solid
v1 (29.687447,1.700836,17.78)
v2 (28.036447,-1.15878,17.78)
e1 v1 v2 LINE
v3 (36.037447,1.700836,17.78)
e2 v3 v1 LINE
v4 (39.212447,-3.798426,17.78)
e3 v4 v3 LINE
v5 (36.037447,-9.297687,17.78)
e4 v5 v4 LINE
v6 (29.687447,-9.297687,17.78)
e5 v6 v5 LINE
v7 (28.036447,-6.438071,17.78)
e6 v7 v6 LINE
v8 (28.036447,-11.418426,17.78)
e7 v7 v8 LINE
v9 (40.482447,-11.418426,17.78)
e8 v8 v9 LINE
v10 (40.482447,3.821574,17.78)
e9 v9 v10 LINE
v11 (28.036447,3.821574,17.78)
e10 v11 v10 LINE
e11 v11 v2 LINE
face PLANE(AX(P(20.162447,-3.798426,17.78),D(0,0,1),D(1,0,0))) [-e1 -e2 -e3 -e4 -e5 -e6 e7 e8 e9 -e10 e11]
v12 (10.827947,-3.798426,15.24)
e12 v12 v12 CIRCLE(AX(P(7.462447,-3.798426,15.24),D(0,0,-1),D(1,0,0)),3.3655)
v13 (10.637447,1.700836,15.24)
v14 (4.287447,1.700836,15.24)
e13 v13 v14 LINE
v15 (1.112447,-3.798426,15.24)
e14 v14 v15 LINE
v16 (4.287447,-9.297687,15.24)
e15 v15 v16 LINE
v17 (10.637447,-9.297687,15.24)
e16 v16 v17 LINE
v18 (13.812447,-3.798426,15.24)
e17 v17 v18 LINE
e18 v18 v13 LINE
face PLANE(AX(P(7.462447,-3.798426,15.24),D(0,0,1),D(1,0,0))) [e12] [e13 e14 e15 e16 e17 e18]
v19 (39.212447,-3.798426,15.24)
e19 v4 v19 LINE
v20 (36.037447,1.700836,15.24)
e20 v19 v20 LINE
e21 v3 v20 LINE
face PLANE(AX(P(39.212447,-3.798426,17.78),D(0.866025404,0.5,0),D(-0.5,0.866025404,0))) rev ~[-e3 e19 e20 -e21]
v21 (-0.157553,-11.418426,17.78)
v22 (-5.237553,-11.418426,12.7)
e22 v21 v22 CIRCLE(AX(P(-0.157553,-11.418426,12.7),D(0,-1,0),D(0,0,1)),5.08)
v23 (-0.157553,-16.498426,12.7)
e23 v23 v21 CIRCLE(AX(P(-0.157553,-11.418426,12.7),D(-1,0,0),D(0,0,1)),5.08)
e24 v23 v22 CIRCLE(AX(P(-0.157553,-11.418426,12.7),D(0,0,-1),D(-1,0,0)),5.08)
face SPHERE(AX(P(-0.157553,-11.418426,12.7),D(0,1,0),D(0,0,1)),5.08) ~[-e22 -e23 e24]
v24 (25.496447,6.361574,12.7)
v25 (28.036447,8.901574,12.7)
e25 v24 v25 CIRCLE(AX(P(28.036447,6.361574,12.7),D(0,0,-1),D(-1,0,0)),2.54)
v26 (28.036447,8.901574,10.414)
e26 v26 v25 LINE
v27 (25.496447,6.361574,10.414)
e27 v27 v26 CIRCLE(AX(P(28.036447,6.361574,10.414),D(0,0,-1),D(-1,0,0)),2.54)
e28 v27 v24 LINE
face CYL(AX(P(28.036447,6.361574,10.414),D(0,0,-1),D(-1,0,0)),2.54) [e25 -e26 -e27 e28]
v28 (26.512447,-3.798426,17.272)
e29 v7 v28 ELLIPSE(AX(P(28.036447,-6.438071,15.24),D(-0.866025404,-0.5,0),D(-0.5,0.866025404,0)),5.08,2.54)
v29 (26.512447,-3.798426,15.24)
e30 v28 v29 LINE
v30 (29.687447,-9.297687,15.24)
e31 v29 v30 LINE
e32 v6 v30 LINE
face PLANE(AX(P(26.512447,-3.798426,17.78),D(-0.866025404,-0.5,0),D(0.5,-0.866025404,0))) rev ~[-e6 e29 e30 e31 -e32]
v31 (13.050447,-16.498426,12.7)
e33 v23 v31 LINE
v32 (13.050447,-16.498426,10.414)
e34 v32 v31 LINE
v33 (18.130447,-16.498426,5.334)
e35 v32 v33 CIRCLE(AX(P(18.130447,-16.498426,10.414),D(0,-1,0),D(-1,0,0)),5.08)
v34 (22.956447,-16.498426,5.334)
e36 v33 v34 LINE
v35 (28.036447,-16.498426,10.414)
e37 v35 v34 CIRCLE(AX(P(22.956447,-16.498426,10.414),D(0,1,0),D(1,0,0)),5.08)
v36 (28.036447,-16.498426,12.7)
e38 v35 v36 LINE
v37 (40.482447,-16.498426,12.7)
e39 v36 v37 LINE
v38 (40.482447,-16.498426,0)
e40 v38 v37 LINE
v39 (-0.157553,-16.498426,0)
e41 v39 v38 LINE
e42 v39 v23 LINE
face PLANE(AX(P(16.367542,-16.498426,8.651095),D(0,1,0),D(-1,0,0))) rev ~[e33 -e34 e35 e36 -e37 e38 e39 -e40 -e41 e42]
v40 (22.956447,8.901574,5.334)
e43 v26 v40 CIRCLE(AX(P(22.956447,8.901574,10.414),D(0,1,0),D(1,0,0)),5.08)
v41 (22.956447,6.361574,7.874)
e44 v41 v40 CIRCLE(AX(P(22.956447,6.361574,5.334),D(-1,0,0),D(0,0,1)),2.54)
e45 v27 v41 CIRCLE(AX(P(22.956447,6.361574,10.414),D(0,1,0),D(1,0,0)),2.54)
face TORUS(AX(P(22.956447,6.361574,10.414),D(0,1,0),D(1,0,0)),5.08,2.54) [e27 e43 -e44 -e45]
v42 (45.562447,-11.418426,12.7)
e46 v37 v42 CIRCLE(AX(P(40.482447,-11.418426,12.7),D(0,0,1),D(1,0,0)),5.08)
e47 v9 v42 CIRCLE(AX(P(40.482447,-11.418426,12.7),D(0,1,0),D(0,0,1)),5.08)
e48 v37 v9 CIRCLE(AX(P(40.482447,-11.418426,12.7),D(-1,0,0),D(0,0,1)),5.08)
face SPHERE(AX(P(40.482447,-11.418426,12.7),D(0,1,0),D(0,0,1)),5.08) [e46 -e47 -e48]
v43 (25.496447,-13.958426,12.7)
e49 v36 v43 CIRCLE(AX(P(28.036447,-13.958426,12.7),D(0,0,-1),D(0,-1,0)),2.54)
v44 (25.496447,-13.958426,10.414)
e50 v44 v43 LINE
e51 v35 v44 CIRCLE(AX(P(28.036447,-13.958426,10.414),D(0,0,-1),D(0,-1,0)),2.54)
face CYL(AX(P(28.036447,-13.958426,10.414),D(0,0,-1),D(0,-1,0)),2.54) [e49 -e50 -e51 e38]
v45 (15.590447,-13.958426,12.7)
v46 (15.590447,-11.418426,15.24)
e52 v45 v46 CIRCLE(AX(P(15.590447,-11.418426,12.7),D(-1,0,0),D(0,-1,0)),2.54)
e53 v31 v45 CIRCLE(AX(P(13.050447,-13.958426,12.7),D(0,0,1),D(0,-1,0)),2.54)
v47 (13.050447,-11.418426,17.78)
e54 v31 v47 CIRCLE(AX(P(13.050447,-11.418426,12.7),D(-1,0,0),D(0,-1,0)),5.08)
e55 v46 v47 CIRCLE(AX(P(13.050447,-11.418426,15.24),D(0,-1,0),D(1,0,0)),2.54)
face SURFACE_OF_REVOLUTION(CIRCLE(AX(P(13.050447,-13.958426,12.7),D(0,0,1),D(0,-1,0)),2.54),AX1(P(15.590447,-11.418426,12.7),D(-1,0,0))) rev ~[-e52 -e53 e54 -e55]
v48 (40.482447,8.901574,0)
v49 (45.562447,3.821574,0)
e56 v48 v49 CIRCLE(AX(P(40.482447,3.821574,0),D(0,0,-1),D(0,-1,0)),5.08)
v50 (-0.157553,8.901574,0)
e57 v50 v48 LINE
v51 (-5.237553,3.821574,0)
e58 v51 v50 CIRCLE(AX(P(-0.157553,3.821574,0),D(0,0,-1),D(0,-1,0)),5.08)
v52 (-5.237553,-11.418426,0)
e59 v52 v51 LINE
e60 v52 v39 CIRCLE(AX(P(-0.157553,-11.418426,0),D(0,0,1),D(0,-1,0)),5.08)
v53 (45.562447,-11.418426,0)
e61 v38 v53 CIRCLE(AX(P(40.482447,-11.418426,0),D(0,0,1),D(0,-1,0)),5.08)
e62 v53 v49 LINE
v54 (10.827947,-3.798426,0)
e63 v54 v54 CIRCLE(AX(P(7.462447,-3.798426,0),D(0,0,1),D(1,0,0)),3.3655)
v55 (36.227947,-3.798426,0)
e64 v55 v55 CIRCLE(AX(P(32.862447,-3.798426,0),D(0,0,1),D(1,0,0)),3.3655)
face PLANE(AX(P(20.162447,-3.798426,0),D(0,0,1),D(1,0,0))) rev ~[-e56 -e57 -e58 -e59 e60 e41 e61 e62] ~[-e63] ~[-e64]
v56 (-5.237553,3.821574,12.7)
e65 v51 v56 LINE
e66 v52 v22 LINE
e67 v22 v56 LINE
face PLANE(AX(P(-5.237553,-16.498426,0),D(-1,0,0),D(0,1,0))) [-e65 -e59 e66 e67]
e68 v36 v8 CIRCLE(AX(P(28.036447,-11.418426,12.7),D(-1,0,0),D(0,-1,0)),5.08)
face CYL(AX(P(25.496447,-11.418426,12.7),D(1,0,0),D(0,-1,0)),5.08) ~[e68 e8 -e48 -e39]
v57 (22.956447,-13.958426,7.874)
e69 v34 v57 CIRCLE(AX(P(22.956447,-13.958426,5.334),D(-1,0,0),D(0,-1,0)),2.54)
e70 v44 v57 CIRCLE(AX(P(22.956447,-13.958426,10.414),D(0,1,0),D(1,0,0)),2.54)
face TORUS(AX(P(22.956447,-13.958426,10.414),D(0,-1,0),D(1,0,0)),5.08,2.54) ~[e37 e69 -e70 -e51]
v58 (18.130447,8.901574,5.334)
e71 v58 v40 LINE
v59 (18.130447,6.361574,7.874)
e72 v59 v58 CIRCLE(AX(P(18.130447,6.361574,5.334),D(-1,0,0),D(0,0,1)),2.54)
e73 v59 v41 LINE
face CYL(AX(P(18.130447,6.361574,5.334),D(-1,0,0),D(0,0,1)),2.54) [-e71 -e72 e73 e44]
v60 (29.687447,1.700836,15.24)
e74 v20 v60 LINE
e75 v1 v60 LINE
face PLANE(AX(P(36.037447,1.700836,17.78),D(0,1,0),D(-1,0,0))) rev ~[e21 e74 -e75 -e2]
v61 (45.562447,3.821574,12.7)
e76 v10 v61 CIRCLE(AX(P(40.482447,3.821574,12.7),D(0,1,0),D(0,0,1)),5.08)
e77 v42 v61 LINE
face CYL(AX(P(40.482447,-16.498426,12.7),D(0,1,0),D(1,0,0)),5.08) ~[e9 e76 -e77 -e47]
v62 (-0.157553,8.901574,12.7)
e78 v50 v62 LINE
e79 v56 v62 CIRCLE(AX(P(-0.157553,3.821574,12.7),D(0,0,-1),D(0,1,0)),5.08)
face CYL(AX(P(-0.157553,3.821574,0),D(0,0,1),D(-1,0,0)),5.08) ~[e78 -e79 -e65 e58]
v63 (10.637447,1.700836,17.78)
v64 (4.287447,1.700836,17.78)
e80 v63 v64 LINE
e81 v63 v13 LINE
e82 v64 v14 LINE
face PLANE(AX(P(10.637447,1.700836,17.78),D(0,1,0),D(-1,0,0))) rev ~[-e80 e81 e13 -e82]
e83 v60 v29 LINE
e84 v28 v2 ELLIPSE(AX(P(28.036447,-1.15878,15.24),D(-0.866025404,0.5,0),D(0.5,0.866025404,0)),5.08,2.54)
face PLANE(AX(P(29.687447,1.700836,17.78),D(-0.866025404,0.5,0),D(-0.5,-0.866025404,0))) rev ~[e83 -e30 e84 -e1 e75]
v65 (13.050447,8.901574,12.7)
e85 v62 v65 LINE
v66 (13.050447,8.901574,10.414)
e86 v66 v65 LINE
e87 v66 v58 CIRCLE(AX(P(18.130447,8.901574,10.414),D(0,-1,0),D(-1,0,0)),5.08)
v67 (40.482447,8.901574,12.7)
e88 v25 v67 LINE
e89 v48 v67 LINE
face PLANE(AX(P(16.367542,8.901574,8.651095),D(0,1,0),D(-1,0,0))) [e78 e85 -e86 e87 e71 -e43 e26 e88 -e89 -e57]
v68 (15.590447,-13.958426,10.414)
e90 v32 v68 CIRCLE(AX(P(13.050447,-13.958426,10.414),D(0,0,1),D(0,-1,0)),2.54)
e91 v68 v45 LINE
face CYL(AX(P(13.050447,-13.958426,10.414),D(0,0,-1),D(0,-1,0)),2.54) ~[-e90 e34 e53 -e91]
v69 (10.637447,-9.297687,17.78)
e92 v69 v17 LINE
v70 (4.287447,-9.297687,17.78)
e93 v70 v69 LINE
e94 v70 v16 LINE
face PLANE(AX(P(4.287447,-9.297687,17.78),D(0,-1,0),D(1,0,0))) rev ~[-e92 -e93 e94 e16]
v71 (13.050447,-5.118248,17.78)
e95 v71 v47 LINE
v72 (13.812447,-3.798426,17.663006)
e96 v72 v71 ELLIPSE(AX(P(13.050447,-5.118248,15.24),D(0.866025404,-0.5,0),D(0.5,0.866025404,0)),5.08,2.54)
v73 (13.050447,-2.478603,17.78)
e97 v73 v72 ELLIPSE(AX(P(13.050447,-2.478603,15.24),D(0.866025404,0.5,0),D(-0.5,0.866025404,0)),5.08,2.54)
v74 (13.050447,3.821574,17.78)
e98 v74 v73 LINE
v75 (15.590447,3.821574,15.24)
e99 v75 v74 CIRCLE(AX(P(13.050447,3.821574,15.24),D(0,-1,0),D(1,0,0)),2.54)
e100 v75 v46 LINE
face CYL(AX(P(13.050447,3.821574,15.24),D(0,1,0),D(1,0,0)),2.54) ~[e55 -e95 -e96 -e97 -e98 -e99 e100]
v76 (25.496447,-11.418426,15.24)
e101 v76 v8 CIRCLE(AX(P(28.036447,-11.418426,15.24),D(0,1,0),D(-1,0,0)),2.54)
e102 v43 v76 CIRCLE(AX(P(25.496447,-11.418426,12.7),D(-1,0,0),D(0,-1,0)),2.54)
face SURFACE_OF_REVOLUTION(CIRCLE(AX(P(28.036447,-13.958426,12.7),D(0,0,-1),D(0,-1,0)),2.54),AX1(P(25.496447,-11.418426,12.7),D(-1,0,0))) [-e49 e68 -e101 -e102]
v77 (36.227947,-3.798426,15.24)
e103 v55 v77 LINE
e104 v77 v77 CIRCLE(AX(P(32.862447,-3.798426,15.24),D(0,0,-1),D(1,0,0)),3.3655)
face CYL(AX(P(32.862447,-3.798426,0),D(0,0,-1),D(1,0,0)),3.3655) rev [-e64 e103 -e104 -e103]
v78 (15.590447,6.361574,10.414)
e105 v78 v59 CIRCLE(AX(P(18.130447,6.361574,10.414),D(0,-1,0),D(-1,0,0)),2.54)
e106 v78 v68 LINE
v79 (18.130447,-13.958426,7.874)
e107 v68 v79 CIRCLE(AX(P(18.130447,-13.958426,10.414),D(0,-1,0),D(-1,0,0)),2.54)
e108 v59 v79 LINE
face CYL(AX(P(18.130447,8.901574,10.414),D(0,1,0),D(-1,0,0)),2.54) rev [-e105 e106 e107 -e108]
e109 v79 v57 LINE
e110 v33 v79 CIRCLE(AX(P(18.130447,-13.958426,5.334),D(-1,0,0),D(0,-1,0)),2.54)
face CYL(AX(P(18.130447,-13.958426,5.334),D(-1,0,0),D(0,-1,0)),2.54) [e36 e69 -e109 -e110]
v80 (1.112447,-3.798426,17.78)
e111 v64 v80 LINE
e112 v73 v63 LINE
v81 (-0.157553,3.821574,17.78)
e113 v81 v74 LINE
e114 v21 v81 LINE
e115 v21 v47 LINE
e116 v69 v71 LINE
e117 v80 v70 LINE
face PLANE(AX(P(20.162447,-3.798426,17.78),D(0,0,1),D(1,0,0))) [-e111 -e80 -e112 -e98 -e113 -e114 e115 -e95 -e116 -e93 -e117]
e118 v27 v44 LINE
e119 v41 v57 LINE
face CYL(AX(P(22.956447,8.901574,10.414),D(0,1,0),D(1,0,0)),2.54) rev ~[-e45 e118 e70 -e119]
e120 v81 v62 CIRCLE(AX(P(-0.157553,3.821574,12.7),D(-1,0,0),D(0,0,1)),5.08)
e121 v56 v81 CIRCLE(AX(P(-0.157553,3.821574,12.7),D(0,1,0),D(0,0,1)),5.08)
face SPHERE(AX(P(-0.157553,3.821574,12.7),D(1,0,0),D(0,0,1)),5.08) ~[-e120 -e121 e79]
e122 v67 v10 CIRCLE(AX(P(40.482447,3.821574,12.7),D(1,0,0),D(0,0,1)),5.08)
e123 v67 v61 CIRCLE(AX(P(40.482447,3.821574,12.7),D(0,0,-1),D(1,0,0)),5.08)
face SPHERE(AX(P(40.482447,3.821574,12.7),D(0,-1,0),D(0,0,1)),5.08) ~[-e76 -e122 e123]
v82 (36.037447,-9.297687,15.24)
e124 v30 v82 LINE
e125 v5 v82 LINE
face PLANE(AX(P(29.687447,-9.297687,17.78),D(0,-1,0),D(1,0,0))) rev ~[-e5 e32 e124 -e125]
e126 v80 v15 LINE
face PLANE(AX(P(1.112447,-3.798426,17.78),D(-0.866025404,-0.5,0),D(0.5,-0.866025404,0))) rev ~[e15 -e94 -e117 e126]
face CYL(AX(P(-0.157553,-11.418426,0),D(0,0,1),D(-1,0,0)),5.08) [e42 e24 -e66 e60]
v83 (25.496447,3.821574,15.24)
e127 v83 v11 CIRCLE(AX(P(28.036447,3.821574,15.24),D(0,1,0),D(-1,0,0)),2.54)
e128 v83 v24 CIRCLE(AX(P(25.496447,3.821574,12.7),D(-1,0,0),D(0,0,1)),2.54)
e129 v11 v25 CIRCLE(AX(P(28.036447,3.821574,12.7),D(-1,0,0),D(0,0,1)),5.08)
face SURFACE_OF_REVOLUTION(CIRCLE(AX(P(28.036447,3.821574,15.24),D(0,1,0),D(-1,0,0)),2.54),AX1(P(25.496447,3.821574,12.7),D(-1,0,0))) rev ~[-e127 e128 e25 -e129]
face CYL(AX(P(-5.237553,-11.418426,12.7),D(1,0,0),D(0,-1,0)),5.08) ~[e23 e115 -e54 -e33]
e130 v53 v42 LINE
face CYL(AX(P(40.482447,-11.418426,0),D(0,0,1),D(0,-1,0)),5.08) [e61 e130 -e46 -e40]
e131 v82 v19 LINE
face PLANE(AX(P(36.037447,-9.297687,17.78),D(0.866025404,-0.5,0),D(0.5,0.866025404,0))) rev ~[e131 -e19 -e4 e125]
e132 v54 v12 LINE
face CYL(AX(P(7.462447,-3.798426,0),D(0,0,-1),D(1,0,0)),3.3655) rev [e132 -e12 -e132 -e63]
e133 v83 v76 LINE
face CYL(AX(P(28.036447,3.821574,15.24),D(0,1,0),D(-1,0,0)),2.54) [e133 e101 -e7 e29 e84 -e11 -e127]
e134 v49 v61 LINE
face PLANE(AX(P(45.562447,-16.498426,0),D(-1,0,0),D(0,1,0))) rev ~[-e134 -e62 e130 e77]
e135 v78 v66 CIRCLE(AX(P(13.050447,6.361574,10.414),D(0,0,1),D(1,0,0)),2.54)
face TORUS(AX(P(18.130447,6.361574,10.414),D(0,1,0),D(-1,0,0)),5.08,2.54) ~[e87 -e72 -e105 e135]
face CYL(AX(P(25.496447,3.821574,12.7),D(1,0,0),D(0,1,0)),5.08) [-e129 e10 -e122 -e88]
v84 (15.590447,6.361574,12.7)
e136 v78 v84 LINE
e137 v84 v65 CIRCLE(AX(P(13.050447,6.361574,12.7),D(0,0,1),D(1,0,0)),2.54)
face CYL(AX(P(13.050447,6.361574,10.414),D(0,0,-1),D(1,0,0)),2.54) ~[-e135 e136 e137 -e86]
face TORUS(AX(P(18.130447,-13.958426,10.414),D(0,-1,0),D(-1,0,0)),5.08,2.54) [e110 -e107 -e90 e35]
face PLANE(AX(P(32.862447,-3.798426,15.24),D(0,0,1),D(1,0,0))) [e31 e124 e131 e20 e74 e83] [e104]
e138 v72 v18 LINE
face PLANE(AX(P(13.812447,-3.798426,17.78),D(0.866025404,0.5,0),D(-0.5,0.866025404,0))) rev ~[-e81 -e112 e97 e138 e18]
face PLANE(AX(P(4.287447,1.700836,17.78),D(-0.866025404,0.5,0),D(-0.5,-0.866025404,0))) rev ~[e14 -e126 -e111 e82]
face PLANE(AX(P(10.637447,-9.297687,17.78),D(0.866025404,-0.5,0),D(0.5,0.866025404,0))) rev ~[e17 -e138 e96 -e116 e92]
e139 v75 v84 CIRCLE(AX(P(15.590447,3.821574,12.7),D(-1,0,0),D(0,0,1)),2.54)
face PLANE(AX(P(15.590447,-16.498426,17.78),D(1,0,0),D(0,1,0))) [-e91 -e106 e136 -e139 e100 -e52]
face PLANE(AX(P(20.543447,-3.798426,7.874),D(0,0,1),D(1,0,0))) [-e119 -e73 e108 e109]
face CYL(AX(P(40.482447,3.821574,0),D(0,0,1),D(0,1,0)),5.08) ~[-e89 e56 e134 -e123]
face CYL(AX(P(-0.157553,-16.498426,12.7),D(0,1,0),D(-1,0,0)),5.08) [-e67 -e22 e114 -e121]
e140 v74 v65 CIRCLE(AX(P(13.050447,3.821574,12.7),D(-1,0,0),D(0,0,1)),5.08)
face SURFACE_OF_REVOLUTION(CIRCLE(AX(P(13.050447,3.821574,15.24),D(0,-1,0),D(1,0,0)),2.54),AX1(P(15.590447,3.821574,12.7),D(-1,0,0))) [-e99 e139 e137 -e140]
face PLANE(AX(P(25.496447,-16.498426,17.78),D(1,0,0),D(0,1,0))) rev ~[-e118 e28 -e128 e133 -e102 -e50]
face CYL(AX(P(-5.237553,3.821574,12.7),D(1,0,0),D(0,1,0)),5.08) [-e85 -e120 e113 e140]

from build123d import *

# Parameters (mm, degrees)
F0_W         = 50.8
F0_H         = 25.4
F0_R         = 3.3655
F1_DEPTH     = 17.78
F2_W         = 9.906
F2_H         = 25.4
F3_DEPTH     = 9.906
F5_DEPTH     = 2.54
F6_R         = 5.08
F7_T1_DEPTH  = 25.4
F7_T3_DEPTH  = 4.826
F7_T5_DEPTH  = 15.24
F7_T7_DEPTH  = 2.286
F7_T10_ANGLE = 90
F7_T12_ANGLE = 90
F7_T14_ANGLE = 90
F7_T16_ANGLE = 90
F7_T18_ANGLE = 90
F7_T20_ANGLE = 90
F7_T22_ANGLE = 90
F7_T24_ANGLE = 90


# Not quite as in the source:
# - a fillet or chamfer that OpenCascade refuses, or shapes differently, is made with other operations: its cross-section is extruded or revolved along the edge and cut away or added
# - a feature names something its author has since deleted; it is built from what else it names


with BuildPart() as f1:
    # F0 (on Top) → F1 (new body)
    with BuildSketch(Plane.XY):
        with Locations((20.1624472324, -3.7984256737)):
            Rectangle(F0_W, F0_H)
        with Locations((7.4624472324, -3.7984256737)):
            Circle(F0_R, mode=Mode.SUBTRACT)
        with Locations((32.8624472324, -3.7984256737)):
            Circle(F0_R, mode=Mode.SUBTRACT)
    extrude(amount=F1_DEPTH)

    # F2 (on face) → F3 (cut)
    with BuildSketch(Plane.XY.offset(17.78)):
        with Locations((20.5434472324, -3.7984256737)):
            Rectangle(F2_W, F2_H)
    extrude(amount=-F3_DEPTH, mode=Mode.SUBTRACT)

    # F4 (on face) → F5 (cut)
    with BuildSketch(Plane.XY.offset(17.78)):
        Polygon((29.6874472324, -9.2976869878), (36.0374472324, -9.2976869878), (39.2124472324, -3.7984256737), (36.0374472324, 1.7008356403), (29.6874472324, 1.7008356403), (26.5124472324, -3.7984256737), align=None)
        Polygon((4.2874472324, -9.2976869878), (10.6374472324, -9.2976869878), (13.8124472324, -3.7984256737), (10.6374472324, 1.7008356403), (4.2874472324, 1.7008356403), (1.1124472324, -3.7984256737), align=None)
    extrude(amount=-F5_DEPTH, mode=Mode.SUBTRACT)

    # F6
    f6_edges = [f1.edges().sort_by_distance(p)[0] for p in [
        (45.562447, -3.798426, 17.78),
        (5.176447, 8.901574, 17.78),
        (-5.237553, -3.798426, 17.78),
        (5.176447, -16.498426, 17.78),
        (35.529447, -16.498426, 17.78),
        (35.529447, 8.901574, 17.78),
        (-5.237553, 8.901574, 8.89),
        (-5.237553, -16.498426, 8.89),
        (45.562447, -16.498426, 8.89),
        (45.562447, 8.901574, 8.89),
    ]]
    fillet(f6_edges, radius=F6_R)

    # F7: fillet of radius 2.54 on 10 edges, made by hand

    # F7_s2 → F7_t1 (join)
    with BuildSketch(Plane.XZ.offset(-8.9015743263)):
        with BuildLine():
            ThreePointArc((15.5904472324, 10.414), (16.3343960082, 8.6179487758), (18.1304472324, 7.874))
            Line((18.1304472324, 7.874), (15.5904472324, 7.874))
            Line((15.5904472324, 7.874), (15.5904472324, 10.414))
        make_face()
        with BuildLine():
            ThreePointArc((25.4964472324, 10.414), (24.7524984566, 8.6179487758), (22.9564472324, 7.874))
            Line((22.9564472324, 7.874), (25.4964472324, 7.874))
            Line((25.4964472324, 7.874), (25.4964472324, 10.414))
        make_face()
    extrude(amount=F7_T1_DEPTH)

    # F7_s4 → F7_t3 (cut)
    with BuildSketch(Plane.YZ.offset(18.1304472324)):
        with BuildLine():
            ThreePointArc((6.3615743263, 7.874), (8.1576255505, 7.1300512242), (8.9015743263, 5.334))
            Line((8.9015743263, 5.334), (8.9015743263, 7.874))
            Line((8.9015743263, 7.874), (6.3615743263, 7.874))
        make_face()
        with BuildLine():
            ThreePointArc((-16.4984256737, 5.334), (-15.7544768979, 7.1300512242), (-13.9584256737, 7.874))
            Line((-13.9584256737, 7.874), (-16.4984256737, 7.874))
            Line((-16.4984256737, 7.874), (-16.4984256737, 5.334))
        make_face()
    extrude(amount=F7_T3_DEPTH, mode=Mode.SUBTRACT)

    # F7_s6 → F7_t5 (cut)
    with BuildSketch(Plane.XZ.offset(-3.8215743263)):
        with BuildLine():
            ThreePointArc((15.5904472324, 15.24), (14.8464984566, 17.0360512242), (13.0504472324, 17.78))
            Line((13.0504472324, 17.78), (15.5904472324, 17.78))
            Line((15.5904472324, 17.78), (15.5904472324, 15.24))
        make_face()
        with BuildLine():
            ThreePointArc((25.4964472324, 15.24), (26.2403960082, 17.0360512242), (28.0364472324, 17.78))
            Line((28.0364472324, 17.78), (25.4964472324, 17.78))
            Line((25.4964472324, 17.78), (25.4964472324, 15.24))
        make_face()
    extrude(amount=F7_T5_DEPTH, mode=Mode.SUBTRACT)

    # F7_s8 → F7_t7 (cut)
    with BuildSketch(Plane.XY.offset(10.414)):
        with BuildLine():
            ThreePointArc((25.4964472324, 6.3615743263), (26.2403960082, 8.1576255505), (28.0364472324, 8.9015743263))
            Line((28.0364472324, 8.9015743263), (25.4964472324, 8.9015743263))
            Line((25.4964472324, 8.9015743263), (25.4964472324, 6.3615743263))
        make_face()
        with BuildLine():
            ThreePointArc((15.5904472324, 6.3615743263), (14.8464984566, 8.1576255505), (13.0504472324, 8.9015743263))
            Line((13.0504472324, 8.9015743263), (15.5904472324, 8.9015743263))
            Line((15.5904472324, 8.9015743263), (15.5904472324, 6.3615743263))
        make_face()
        with BuildLine():
            ThreePointArc((28.0364472324, -16.4984256737), (26.2403960082, -15.7544768979), (25.4964472324, -13.9584256737))
            Line((25.4964472324, -13.9584256737), (25.4964472324, -16.4984256737))
            Line((25.4964472324, -16.4984256737), (28.0364472324, -16.4984256737))
        make_face()
        with BuildLine():
            ThreePointArc((13.0504472324, -16.4984256737), (14.8464984566, -15.7544768979), (15.5904472324, -13.9584256737))
            Line((15.5904472324, -13.9584256737), (15.5904472324, -16.4984256737))
            Line((15.5904472324, -16.4984256737), (13.0504472324, -16.4984256737))
        make_face()
    extrude(amount=F7_T7_DEPTH, mode=Mode.SUBTRACT)

    # F7_s9 → F7_t10 (revolve, cut)
    with BuildSketch(Plane.XY.offset(12.7)):
        with BuildLine():
            ThreePointArc((13.0504472324, -16.4984256737), (14.8464984566, -15.7544768979), (15.5904472324, -13.9584256737))
            Line((15.5904472324, -13.9584256737), (15.5904472324, -16.4984256737))
            Line((15.5904472324, -16.4984256737), (13.0504472324, -16.4984256737))
        make_face()
    revolve(axis=Axis((15.5904472324, -11.4184256737, 12.7), (-1, 0, 0)), revolution_arc=F7_T10_ANGLE, mode=Mode.SUBTRACT)

    # F7_s11 → F7_t12 (revolve, cut)
    with BuildSketch(Plane.XY.offset(12.7)):
        with BuildLine():
            ThreePointArc((28.0364472324, -16.4984256737), (26.2403960082, -15.7544768979), (25.4964472324, -13.9584256737))
            Line((25.4964472324, -13.9584256737), (25.4964472324, -16.4984256737))
            Line((25.4964472324, -16.4984256737), (28.0364472324, -16.4984256737))
        make_face()
    revolve(axis=Axis((25.4964472324, -11.4184256737, 12.7), (-1, 0, 0)), revolution_arc=F7_T12_ANGLE, mode=Mode.SUBTRACT)

    # F7_s13 → F7_t14 (revolve, cut)
    with BuildSketch(Plane.XZ.offset(-3.8215743263)):
        with BuildLine():
            ThreePointArc((15.5904472324, 15.24), (14.8464984566, 17.0360512242), (13.0504472324, 17.78))
            Line((13.0504472324, 17.78), (15.5904472324, 17.78))
            Line((15.5904472324, 17.78), (15.5904472324, 15.24))
        make_face()
    revolve(axis=Axis((15.5904472324, 3.8215743263, 12.7), (-1, 0, 0)), revolution_arc=F7_T14_ANGLE, mode=Mode.SUBTRACT)

    # F7_s15 → F7_t16 (revolve, cut)
    with BuildSketch(Plane.XZ.offset(-3.8215743263)):
        with BuildLine():
            ThreePointArc((25.4964472324, 15.24), (26.2403960082, 17.0360512242), (28.0364472324, 17.78))
            Line((28.0364472324, 17.78), (25.4964472324, 17.78))
            Line((25.4964472324, 17.78), (25.4964472324, 15.24))
        make_face()
    revolve(axis=Axis((25.4964472324, 3.8215743263, 12.7), (-1, 0, 0)), revolution_arc=F7_T16_ANGLE, mode=Mode.SUBTRACT)

    # F7_s17 → F7_t18 (revolve, cut)
    with BuildSketch(Plane.XY.offset(10.414)):
        with BuildLine():
            ThreePointArc((13.0504472324, -16.4984256737), (14.8464984566, -15.7544768979), (15.5904472324, -13.9584256737))
            Line((15.5904472324, -13.9584256737), (15.5904472324, -16.4984256737))
            Line((15.5904472324, -16.4984256737), (13.0504472324, -16.4984256737))
        make_face()
    revolve(axis=Axis((18.1304472324, -16.4984256737, 10.414), (0, -1, 0)), revolution_arc=F7_T18_ANGLE, mode=Mode.SUBTRACT)

    # F7_s19 → F7_t20 (revolve, cut)
    with BuildSketch(Plane.XY.offset(10.414)):
        with BuildLine():
            ThreePointArc((28.0364472324, -16.4984256737), (26.2403960082, -15.7544768979), (25.4964472324, -13.9584256737))
            Line((25.4964472324, -13.9584256737), (25.4964472324, -16.4984256737))
            Line((25.4964472324, -16.4984256737), (28.0364472324, -16.4984256737))
        make_face()
    revolve(axis=Axis((22.9564472324, -16.4984256737, 10.414), (0, 1, 0)), revolution_arc=F7_T20_ANGLE, mode=Mode.SUBTRACT)

    # F7_s21 → F7_t22 (revolve, cut)
    with BuildSketch(Plane.XY.offset(10.414)):
        with BuildLine():
            ThreePointArc((13.0504472324, 8.9015743263), (14.8464984566, 8.1576255505), (15.5904472324, 6.3615743263))
            Line((15.5904472324, 6.3615743263), (15.5904472324, 8.9015743263))
            Line((15.5904472324, 8.9015743263), (13.0504472324, 8.9015743263))
        make_face()
    revolve(axis=Axis((18.1304472324, 8.9015743263, 10.414), (0, -1, 0)), revolution_arc=F7_T22_ANGLE, mode=Mode.SUBTRACT)

    # F7_s23 → F7_t24 (revolve, cut)
    with BuildSketch(Plane.XY.offset(10.414)):
        with BuildLine():
            ThreePointArc((28.0364472324, 8.9015743263), (26.2403960082, 8.1576255505), (25.4964472324, 6.3615743263))
            Line((25.4964472324, 6.3615743263), (25.4964472324, 8.9015743263))
            Line((25.4964472324, 8.9015743263), (28.0364472324, 8.9015743263))
        make_face()
    revolve(axis=Axis((22.9564472324, 8.9015743263, 10.414), (0, 1, 0)), revolution_arc=F7_T24_ANGLE, mode=Mode.SUBTRACT)


solid = f1.part
